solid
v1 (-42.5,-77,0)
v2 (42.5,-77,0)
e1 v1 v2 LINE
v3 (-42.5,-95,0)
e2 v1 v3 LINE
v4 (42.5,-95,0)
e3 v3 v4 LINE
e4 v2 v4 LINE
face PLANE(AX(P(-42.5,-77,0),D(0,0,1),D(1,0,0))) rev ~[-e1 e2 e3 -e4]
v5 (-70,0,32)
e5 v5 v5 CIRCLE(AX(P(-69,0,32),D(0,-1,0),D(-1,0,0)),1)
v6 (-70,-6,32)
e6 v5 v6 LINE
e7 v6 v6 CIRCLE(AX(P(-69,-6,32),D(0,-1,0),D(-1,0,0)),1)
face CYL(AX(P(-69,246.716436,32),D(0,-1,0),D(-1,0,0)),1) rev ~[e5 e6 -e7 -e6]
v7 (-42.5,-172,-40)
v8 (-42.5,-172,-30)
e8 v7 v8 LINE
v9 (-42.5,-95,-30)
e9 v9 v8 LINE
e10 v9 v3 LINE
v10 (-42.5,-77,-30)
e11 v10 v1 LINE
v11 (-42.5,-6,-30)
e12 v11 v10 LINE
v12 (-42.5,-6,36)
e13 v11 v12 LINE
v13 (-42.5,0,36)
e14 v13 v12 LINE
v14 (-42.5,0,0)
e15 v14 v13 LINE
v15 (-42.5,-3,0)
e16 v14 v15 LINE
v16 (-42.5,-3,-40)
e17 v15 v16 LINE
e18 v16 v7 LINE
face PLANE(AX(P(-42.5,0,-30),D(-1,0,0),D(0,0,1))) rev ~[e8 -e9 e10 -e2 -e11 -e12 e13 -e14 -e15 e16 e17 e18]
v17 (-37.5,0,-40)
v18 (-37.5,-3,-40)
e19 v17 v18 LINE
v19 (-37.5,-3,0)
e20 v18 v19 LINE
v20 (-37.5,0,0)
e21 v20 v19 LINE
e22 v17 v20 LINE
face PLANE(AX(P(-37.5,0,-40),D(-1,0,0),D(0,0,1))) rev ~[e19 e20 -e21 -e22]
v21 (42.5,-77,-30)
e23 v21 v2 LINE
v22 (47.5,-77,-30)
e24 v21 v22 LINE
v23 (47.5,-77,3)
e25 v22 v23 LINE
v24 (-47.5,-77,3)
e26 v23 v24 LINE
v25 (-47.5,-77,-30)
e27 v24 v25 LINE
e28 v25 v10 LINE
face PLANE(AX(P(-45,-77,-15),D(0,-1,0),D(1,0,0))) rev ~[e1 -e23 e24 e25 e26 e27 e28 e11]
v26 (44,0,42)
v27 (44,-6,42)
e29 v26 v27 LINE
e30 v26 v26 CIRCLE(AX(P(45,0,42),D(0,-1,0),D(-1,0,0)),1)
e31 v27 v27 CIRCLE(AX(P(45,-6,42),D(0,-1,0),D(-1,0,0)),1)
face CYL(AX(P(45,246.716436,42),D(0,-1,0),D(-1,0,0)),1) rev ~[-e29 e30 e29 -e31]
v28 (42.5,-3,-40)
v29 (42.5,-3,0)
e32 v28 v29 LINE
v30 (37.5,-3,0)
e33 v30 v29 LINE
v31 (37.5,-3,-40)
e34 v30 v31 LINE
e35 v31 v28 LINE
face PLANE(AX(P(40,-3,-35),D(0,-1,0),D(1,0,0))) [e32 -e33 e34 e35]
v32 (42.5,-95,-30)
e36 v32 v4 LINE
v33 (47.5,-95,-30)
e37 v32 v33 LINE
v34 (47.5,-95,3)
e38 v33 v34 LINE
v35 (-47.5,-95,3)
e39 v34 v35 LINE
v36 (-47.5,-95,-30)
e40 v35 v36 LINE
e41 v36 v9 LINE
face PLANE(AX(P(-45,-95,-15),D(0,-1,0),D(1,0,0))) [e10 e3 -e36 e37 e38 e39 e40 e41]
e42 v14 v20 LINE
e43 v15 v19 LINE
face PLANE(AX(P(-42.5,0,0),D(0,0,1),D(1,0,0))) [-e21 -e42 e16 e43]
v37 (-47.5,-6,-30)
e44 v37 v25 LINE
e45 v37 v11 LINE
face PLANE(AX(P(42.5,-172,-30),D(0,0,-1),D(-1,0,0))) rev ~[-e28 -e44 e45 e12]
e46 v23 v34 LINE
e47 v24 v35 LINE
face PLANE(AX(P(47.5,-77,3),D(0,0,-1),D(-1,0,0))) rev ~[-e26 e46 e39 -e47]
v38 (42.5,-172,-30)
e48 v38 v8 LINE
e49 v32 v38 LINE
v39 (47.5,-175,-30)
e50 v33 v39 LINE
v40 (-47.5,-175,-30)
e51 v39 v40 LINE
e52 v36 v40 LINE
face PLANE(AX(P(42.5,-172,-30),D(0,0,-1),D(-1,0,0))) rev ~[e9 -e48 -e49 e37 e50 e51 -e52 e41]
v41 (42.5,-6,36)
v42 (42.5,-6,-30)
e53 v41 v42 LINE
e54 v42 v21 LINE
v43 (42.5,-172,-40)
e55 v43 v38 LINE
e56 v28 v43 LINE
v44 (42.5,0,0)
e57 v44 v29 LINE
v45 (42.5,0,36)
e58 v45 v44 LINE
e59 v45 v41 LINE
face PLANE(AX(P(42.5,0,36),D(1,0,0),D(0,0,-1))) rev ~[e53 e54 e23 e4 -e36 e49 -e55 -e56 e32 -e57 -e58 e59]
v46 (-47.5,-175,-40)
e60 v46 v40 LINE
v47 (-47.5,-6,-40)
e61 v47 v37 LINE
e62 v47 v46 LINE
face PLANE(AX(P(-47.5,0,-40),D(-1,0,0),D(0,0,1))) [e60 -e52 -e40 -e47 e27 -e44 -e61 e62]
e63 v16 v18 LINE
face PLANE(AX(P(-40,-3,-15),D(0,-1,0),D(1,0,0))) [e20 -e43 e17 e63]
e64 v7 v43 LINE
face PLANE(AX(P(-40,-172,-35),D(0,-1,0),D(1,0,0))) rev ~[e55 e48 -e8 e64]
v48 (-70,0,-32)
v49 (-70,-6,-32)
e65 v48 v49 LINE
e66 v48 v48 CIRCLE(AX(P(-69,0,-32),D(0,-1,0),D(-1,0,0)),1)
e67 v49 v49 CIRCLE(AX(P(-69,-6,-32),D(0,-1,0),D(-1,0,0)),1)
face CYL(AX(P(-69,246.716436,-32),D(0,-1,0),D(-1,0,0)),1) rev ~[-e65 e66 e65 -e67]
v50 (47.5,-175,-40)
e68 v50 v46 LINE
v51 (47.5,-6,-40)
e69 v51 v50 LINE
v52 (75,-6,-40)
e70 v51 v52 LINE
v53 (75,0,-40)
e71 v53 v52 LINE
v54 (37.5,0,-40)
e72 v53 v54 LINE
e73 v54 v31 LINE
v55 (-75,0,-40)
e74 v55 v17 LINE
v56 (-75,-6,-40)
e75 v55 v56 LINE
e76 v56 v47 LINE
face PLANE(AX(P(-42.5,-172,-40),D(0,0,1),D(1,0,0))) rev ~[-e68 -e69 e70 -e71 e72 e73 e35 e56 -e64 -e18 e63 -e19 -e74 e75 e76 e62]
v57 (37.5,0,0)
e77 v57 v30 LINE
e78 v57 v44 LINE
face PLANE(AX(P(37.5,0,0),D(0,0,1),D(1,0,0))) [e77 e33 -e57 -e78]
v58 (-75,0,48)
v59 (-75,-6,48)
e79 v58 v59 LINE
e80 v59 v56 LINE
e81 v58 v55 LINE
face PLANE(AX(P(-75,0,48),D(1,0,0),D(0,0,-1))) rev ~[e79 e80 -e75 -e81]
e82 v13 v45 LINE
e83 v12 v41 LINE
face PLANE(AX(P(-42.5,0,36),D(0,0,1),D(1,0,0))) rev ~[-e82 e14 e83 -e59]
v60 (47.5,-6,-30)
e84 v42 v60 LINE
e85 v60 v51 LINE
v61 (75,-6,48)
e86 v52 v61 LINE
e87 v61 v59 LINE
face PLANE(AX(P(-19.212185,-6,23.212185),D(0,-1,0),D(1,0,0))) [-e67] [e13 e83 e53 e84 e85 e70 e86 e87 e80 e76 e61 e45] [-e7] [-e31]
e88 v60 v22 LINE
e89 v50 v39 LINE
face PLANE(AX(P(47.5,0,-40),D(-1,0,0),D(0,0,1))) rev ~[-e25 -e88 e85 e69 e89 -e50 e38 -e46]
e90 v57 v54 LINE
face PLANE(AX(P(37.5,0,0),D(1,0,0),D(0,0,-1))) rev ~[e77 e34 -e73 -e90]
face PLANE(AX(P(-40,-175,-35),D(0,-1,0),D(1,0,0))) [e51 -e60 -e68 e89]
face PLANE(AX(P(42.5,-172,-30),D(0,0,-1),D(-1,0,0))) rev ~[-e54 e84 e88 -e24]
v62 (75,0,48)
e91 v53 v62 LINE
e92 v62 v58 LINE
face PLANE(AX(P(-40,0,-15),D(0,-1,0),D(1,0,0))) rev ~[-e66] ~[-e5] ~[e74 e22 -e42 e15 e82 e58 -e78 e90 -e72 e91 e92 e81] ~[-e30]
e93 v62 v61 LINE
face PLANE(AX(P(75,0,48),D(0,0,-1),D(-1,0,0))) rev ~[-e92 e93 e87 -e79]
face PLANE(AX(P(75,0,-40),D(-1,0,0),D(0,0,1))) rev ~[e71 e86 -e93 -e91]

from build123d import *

# Parameters (mm, degrees)
F0_W     = 5
F0_H     = 3
F0_H_2   = 30
F1_DEPTH = 6
F0_H_3   = 10
F2_DEPTH = 175
F3_DEPTH = 3
F4_START = 172
F0_W_2   = 75
F4_DEPTH = 3
F5_START = 77
F5_DEPTH = 18
F6_D     = 2


# Not quite as in the source:
# - a feature names something its author has since deleted; it is built from what else it names


with BuildPart() as f1:
    # F0 (on Front) → F1 (new body)
    with BuildSketch(Plane.XZ):
        Polygon((75, 48), (-75, 48), (-75, -40), (-47.5, -40), (-47.5, -30), (-47.5, 0), (-47.5, 3), (-42.5, 3), (-42.5, 36), (42.5, 36), (75, 36), align=None)
        Polygon((75, -40), (75, 36), (42.5, 36), (42.5, 3), (47.5, 3), (47.5, 0), (47.5, -30), (47.5, -40), align=None)
        with Locations((45, 1.5)):
            Rectangle(F0_W, F0_H)
        with Locations((45, -15)):
            Rectangle(F0_W, F0_H_2)
        with Locations((-45, 1.5)):
            Rectangle(F0_W, F0_H)
        with Locations((-45, -15)):
            Rectangle(F0_W, F0_H_2)
    extrude(amount=F1_DEPTH)

    # F0 (on Front) → F2 (join)
    with BuildSketch(Plane.XZ):
        with Locations((-45, -35)):
            Rectangle(F0_W, F0_H_3)
        with Locations((45, -35)):
            Rectangle(F0_W, F0_H_3)
    extrude(amount=F2_DEPTH)

    # F0 (on Front) → F3 (join)
    with BuildSketch(Plane.XZ):
        with Locations((-40, -15)):
            Rectangle(F0_W, F0_H_2)
        with Locations((-40, -35)):
            Rectangle(F0_W, F0_H_3)
        with Locations((40, -35)):
            Rectangle(F0_W, F0_H_3)
        with Locations((40, -15)):
            Rectangle(F0_W, F0_H_2)
    extrude(amount=F3_DEPTH)

    # F0 (on Front) → F4 (join)
    with BuildSketch(Plane.XZ.offset(F4_START)):
        with Locations((-40, -35)):
            Rectangle(F0_W, F0_H_3)
        with Locations((40, -35)):
            Rectangle(F0_W, F0_H_3)
        with Locations((0, -35)):
            Rectangle(F0_W_2, F0_H_3)
    extrude(amount=F4_DEPTH)

    # F0 (on Front) → F5 (join)
    with BuildSketch(Plane.XZ.offset(F5_START)):
        with Locations((-45, -15)):
            Rectangle(F0_W, F0_H_2)
        with Locations((45, -15)):
            Rectangle(F0_W, F0_H_2)
        Polygon((42.5, 0), (42.5, 3), (-42.5, 3), (-42.5, 0), (-37.5, 0), (37.5, 0), align=None)
        with Locations((45, 1.5)):
            Rectangle(F0_W, F0_H)
        with Locations((-45, 1.5)):
            Rectangle(F0_W, F0_H)
    extrude(amount=F5_DEPTH)

    # F6 (through all)
    with Locations(Plane(origin=(0, 0, 0), x_dir=(1, 0, 0), z_dir=(0, 1, 0))):
        with Locations((45, -42), (-69, -32), (-69, 32)):
            Hole(F6_D / 2)


solid = f1.part
